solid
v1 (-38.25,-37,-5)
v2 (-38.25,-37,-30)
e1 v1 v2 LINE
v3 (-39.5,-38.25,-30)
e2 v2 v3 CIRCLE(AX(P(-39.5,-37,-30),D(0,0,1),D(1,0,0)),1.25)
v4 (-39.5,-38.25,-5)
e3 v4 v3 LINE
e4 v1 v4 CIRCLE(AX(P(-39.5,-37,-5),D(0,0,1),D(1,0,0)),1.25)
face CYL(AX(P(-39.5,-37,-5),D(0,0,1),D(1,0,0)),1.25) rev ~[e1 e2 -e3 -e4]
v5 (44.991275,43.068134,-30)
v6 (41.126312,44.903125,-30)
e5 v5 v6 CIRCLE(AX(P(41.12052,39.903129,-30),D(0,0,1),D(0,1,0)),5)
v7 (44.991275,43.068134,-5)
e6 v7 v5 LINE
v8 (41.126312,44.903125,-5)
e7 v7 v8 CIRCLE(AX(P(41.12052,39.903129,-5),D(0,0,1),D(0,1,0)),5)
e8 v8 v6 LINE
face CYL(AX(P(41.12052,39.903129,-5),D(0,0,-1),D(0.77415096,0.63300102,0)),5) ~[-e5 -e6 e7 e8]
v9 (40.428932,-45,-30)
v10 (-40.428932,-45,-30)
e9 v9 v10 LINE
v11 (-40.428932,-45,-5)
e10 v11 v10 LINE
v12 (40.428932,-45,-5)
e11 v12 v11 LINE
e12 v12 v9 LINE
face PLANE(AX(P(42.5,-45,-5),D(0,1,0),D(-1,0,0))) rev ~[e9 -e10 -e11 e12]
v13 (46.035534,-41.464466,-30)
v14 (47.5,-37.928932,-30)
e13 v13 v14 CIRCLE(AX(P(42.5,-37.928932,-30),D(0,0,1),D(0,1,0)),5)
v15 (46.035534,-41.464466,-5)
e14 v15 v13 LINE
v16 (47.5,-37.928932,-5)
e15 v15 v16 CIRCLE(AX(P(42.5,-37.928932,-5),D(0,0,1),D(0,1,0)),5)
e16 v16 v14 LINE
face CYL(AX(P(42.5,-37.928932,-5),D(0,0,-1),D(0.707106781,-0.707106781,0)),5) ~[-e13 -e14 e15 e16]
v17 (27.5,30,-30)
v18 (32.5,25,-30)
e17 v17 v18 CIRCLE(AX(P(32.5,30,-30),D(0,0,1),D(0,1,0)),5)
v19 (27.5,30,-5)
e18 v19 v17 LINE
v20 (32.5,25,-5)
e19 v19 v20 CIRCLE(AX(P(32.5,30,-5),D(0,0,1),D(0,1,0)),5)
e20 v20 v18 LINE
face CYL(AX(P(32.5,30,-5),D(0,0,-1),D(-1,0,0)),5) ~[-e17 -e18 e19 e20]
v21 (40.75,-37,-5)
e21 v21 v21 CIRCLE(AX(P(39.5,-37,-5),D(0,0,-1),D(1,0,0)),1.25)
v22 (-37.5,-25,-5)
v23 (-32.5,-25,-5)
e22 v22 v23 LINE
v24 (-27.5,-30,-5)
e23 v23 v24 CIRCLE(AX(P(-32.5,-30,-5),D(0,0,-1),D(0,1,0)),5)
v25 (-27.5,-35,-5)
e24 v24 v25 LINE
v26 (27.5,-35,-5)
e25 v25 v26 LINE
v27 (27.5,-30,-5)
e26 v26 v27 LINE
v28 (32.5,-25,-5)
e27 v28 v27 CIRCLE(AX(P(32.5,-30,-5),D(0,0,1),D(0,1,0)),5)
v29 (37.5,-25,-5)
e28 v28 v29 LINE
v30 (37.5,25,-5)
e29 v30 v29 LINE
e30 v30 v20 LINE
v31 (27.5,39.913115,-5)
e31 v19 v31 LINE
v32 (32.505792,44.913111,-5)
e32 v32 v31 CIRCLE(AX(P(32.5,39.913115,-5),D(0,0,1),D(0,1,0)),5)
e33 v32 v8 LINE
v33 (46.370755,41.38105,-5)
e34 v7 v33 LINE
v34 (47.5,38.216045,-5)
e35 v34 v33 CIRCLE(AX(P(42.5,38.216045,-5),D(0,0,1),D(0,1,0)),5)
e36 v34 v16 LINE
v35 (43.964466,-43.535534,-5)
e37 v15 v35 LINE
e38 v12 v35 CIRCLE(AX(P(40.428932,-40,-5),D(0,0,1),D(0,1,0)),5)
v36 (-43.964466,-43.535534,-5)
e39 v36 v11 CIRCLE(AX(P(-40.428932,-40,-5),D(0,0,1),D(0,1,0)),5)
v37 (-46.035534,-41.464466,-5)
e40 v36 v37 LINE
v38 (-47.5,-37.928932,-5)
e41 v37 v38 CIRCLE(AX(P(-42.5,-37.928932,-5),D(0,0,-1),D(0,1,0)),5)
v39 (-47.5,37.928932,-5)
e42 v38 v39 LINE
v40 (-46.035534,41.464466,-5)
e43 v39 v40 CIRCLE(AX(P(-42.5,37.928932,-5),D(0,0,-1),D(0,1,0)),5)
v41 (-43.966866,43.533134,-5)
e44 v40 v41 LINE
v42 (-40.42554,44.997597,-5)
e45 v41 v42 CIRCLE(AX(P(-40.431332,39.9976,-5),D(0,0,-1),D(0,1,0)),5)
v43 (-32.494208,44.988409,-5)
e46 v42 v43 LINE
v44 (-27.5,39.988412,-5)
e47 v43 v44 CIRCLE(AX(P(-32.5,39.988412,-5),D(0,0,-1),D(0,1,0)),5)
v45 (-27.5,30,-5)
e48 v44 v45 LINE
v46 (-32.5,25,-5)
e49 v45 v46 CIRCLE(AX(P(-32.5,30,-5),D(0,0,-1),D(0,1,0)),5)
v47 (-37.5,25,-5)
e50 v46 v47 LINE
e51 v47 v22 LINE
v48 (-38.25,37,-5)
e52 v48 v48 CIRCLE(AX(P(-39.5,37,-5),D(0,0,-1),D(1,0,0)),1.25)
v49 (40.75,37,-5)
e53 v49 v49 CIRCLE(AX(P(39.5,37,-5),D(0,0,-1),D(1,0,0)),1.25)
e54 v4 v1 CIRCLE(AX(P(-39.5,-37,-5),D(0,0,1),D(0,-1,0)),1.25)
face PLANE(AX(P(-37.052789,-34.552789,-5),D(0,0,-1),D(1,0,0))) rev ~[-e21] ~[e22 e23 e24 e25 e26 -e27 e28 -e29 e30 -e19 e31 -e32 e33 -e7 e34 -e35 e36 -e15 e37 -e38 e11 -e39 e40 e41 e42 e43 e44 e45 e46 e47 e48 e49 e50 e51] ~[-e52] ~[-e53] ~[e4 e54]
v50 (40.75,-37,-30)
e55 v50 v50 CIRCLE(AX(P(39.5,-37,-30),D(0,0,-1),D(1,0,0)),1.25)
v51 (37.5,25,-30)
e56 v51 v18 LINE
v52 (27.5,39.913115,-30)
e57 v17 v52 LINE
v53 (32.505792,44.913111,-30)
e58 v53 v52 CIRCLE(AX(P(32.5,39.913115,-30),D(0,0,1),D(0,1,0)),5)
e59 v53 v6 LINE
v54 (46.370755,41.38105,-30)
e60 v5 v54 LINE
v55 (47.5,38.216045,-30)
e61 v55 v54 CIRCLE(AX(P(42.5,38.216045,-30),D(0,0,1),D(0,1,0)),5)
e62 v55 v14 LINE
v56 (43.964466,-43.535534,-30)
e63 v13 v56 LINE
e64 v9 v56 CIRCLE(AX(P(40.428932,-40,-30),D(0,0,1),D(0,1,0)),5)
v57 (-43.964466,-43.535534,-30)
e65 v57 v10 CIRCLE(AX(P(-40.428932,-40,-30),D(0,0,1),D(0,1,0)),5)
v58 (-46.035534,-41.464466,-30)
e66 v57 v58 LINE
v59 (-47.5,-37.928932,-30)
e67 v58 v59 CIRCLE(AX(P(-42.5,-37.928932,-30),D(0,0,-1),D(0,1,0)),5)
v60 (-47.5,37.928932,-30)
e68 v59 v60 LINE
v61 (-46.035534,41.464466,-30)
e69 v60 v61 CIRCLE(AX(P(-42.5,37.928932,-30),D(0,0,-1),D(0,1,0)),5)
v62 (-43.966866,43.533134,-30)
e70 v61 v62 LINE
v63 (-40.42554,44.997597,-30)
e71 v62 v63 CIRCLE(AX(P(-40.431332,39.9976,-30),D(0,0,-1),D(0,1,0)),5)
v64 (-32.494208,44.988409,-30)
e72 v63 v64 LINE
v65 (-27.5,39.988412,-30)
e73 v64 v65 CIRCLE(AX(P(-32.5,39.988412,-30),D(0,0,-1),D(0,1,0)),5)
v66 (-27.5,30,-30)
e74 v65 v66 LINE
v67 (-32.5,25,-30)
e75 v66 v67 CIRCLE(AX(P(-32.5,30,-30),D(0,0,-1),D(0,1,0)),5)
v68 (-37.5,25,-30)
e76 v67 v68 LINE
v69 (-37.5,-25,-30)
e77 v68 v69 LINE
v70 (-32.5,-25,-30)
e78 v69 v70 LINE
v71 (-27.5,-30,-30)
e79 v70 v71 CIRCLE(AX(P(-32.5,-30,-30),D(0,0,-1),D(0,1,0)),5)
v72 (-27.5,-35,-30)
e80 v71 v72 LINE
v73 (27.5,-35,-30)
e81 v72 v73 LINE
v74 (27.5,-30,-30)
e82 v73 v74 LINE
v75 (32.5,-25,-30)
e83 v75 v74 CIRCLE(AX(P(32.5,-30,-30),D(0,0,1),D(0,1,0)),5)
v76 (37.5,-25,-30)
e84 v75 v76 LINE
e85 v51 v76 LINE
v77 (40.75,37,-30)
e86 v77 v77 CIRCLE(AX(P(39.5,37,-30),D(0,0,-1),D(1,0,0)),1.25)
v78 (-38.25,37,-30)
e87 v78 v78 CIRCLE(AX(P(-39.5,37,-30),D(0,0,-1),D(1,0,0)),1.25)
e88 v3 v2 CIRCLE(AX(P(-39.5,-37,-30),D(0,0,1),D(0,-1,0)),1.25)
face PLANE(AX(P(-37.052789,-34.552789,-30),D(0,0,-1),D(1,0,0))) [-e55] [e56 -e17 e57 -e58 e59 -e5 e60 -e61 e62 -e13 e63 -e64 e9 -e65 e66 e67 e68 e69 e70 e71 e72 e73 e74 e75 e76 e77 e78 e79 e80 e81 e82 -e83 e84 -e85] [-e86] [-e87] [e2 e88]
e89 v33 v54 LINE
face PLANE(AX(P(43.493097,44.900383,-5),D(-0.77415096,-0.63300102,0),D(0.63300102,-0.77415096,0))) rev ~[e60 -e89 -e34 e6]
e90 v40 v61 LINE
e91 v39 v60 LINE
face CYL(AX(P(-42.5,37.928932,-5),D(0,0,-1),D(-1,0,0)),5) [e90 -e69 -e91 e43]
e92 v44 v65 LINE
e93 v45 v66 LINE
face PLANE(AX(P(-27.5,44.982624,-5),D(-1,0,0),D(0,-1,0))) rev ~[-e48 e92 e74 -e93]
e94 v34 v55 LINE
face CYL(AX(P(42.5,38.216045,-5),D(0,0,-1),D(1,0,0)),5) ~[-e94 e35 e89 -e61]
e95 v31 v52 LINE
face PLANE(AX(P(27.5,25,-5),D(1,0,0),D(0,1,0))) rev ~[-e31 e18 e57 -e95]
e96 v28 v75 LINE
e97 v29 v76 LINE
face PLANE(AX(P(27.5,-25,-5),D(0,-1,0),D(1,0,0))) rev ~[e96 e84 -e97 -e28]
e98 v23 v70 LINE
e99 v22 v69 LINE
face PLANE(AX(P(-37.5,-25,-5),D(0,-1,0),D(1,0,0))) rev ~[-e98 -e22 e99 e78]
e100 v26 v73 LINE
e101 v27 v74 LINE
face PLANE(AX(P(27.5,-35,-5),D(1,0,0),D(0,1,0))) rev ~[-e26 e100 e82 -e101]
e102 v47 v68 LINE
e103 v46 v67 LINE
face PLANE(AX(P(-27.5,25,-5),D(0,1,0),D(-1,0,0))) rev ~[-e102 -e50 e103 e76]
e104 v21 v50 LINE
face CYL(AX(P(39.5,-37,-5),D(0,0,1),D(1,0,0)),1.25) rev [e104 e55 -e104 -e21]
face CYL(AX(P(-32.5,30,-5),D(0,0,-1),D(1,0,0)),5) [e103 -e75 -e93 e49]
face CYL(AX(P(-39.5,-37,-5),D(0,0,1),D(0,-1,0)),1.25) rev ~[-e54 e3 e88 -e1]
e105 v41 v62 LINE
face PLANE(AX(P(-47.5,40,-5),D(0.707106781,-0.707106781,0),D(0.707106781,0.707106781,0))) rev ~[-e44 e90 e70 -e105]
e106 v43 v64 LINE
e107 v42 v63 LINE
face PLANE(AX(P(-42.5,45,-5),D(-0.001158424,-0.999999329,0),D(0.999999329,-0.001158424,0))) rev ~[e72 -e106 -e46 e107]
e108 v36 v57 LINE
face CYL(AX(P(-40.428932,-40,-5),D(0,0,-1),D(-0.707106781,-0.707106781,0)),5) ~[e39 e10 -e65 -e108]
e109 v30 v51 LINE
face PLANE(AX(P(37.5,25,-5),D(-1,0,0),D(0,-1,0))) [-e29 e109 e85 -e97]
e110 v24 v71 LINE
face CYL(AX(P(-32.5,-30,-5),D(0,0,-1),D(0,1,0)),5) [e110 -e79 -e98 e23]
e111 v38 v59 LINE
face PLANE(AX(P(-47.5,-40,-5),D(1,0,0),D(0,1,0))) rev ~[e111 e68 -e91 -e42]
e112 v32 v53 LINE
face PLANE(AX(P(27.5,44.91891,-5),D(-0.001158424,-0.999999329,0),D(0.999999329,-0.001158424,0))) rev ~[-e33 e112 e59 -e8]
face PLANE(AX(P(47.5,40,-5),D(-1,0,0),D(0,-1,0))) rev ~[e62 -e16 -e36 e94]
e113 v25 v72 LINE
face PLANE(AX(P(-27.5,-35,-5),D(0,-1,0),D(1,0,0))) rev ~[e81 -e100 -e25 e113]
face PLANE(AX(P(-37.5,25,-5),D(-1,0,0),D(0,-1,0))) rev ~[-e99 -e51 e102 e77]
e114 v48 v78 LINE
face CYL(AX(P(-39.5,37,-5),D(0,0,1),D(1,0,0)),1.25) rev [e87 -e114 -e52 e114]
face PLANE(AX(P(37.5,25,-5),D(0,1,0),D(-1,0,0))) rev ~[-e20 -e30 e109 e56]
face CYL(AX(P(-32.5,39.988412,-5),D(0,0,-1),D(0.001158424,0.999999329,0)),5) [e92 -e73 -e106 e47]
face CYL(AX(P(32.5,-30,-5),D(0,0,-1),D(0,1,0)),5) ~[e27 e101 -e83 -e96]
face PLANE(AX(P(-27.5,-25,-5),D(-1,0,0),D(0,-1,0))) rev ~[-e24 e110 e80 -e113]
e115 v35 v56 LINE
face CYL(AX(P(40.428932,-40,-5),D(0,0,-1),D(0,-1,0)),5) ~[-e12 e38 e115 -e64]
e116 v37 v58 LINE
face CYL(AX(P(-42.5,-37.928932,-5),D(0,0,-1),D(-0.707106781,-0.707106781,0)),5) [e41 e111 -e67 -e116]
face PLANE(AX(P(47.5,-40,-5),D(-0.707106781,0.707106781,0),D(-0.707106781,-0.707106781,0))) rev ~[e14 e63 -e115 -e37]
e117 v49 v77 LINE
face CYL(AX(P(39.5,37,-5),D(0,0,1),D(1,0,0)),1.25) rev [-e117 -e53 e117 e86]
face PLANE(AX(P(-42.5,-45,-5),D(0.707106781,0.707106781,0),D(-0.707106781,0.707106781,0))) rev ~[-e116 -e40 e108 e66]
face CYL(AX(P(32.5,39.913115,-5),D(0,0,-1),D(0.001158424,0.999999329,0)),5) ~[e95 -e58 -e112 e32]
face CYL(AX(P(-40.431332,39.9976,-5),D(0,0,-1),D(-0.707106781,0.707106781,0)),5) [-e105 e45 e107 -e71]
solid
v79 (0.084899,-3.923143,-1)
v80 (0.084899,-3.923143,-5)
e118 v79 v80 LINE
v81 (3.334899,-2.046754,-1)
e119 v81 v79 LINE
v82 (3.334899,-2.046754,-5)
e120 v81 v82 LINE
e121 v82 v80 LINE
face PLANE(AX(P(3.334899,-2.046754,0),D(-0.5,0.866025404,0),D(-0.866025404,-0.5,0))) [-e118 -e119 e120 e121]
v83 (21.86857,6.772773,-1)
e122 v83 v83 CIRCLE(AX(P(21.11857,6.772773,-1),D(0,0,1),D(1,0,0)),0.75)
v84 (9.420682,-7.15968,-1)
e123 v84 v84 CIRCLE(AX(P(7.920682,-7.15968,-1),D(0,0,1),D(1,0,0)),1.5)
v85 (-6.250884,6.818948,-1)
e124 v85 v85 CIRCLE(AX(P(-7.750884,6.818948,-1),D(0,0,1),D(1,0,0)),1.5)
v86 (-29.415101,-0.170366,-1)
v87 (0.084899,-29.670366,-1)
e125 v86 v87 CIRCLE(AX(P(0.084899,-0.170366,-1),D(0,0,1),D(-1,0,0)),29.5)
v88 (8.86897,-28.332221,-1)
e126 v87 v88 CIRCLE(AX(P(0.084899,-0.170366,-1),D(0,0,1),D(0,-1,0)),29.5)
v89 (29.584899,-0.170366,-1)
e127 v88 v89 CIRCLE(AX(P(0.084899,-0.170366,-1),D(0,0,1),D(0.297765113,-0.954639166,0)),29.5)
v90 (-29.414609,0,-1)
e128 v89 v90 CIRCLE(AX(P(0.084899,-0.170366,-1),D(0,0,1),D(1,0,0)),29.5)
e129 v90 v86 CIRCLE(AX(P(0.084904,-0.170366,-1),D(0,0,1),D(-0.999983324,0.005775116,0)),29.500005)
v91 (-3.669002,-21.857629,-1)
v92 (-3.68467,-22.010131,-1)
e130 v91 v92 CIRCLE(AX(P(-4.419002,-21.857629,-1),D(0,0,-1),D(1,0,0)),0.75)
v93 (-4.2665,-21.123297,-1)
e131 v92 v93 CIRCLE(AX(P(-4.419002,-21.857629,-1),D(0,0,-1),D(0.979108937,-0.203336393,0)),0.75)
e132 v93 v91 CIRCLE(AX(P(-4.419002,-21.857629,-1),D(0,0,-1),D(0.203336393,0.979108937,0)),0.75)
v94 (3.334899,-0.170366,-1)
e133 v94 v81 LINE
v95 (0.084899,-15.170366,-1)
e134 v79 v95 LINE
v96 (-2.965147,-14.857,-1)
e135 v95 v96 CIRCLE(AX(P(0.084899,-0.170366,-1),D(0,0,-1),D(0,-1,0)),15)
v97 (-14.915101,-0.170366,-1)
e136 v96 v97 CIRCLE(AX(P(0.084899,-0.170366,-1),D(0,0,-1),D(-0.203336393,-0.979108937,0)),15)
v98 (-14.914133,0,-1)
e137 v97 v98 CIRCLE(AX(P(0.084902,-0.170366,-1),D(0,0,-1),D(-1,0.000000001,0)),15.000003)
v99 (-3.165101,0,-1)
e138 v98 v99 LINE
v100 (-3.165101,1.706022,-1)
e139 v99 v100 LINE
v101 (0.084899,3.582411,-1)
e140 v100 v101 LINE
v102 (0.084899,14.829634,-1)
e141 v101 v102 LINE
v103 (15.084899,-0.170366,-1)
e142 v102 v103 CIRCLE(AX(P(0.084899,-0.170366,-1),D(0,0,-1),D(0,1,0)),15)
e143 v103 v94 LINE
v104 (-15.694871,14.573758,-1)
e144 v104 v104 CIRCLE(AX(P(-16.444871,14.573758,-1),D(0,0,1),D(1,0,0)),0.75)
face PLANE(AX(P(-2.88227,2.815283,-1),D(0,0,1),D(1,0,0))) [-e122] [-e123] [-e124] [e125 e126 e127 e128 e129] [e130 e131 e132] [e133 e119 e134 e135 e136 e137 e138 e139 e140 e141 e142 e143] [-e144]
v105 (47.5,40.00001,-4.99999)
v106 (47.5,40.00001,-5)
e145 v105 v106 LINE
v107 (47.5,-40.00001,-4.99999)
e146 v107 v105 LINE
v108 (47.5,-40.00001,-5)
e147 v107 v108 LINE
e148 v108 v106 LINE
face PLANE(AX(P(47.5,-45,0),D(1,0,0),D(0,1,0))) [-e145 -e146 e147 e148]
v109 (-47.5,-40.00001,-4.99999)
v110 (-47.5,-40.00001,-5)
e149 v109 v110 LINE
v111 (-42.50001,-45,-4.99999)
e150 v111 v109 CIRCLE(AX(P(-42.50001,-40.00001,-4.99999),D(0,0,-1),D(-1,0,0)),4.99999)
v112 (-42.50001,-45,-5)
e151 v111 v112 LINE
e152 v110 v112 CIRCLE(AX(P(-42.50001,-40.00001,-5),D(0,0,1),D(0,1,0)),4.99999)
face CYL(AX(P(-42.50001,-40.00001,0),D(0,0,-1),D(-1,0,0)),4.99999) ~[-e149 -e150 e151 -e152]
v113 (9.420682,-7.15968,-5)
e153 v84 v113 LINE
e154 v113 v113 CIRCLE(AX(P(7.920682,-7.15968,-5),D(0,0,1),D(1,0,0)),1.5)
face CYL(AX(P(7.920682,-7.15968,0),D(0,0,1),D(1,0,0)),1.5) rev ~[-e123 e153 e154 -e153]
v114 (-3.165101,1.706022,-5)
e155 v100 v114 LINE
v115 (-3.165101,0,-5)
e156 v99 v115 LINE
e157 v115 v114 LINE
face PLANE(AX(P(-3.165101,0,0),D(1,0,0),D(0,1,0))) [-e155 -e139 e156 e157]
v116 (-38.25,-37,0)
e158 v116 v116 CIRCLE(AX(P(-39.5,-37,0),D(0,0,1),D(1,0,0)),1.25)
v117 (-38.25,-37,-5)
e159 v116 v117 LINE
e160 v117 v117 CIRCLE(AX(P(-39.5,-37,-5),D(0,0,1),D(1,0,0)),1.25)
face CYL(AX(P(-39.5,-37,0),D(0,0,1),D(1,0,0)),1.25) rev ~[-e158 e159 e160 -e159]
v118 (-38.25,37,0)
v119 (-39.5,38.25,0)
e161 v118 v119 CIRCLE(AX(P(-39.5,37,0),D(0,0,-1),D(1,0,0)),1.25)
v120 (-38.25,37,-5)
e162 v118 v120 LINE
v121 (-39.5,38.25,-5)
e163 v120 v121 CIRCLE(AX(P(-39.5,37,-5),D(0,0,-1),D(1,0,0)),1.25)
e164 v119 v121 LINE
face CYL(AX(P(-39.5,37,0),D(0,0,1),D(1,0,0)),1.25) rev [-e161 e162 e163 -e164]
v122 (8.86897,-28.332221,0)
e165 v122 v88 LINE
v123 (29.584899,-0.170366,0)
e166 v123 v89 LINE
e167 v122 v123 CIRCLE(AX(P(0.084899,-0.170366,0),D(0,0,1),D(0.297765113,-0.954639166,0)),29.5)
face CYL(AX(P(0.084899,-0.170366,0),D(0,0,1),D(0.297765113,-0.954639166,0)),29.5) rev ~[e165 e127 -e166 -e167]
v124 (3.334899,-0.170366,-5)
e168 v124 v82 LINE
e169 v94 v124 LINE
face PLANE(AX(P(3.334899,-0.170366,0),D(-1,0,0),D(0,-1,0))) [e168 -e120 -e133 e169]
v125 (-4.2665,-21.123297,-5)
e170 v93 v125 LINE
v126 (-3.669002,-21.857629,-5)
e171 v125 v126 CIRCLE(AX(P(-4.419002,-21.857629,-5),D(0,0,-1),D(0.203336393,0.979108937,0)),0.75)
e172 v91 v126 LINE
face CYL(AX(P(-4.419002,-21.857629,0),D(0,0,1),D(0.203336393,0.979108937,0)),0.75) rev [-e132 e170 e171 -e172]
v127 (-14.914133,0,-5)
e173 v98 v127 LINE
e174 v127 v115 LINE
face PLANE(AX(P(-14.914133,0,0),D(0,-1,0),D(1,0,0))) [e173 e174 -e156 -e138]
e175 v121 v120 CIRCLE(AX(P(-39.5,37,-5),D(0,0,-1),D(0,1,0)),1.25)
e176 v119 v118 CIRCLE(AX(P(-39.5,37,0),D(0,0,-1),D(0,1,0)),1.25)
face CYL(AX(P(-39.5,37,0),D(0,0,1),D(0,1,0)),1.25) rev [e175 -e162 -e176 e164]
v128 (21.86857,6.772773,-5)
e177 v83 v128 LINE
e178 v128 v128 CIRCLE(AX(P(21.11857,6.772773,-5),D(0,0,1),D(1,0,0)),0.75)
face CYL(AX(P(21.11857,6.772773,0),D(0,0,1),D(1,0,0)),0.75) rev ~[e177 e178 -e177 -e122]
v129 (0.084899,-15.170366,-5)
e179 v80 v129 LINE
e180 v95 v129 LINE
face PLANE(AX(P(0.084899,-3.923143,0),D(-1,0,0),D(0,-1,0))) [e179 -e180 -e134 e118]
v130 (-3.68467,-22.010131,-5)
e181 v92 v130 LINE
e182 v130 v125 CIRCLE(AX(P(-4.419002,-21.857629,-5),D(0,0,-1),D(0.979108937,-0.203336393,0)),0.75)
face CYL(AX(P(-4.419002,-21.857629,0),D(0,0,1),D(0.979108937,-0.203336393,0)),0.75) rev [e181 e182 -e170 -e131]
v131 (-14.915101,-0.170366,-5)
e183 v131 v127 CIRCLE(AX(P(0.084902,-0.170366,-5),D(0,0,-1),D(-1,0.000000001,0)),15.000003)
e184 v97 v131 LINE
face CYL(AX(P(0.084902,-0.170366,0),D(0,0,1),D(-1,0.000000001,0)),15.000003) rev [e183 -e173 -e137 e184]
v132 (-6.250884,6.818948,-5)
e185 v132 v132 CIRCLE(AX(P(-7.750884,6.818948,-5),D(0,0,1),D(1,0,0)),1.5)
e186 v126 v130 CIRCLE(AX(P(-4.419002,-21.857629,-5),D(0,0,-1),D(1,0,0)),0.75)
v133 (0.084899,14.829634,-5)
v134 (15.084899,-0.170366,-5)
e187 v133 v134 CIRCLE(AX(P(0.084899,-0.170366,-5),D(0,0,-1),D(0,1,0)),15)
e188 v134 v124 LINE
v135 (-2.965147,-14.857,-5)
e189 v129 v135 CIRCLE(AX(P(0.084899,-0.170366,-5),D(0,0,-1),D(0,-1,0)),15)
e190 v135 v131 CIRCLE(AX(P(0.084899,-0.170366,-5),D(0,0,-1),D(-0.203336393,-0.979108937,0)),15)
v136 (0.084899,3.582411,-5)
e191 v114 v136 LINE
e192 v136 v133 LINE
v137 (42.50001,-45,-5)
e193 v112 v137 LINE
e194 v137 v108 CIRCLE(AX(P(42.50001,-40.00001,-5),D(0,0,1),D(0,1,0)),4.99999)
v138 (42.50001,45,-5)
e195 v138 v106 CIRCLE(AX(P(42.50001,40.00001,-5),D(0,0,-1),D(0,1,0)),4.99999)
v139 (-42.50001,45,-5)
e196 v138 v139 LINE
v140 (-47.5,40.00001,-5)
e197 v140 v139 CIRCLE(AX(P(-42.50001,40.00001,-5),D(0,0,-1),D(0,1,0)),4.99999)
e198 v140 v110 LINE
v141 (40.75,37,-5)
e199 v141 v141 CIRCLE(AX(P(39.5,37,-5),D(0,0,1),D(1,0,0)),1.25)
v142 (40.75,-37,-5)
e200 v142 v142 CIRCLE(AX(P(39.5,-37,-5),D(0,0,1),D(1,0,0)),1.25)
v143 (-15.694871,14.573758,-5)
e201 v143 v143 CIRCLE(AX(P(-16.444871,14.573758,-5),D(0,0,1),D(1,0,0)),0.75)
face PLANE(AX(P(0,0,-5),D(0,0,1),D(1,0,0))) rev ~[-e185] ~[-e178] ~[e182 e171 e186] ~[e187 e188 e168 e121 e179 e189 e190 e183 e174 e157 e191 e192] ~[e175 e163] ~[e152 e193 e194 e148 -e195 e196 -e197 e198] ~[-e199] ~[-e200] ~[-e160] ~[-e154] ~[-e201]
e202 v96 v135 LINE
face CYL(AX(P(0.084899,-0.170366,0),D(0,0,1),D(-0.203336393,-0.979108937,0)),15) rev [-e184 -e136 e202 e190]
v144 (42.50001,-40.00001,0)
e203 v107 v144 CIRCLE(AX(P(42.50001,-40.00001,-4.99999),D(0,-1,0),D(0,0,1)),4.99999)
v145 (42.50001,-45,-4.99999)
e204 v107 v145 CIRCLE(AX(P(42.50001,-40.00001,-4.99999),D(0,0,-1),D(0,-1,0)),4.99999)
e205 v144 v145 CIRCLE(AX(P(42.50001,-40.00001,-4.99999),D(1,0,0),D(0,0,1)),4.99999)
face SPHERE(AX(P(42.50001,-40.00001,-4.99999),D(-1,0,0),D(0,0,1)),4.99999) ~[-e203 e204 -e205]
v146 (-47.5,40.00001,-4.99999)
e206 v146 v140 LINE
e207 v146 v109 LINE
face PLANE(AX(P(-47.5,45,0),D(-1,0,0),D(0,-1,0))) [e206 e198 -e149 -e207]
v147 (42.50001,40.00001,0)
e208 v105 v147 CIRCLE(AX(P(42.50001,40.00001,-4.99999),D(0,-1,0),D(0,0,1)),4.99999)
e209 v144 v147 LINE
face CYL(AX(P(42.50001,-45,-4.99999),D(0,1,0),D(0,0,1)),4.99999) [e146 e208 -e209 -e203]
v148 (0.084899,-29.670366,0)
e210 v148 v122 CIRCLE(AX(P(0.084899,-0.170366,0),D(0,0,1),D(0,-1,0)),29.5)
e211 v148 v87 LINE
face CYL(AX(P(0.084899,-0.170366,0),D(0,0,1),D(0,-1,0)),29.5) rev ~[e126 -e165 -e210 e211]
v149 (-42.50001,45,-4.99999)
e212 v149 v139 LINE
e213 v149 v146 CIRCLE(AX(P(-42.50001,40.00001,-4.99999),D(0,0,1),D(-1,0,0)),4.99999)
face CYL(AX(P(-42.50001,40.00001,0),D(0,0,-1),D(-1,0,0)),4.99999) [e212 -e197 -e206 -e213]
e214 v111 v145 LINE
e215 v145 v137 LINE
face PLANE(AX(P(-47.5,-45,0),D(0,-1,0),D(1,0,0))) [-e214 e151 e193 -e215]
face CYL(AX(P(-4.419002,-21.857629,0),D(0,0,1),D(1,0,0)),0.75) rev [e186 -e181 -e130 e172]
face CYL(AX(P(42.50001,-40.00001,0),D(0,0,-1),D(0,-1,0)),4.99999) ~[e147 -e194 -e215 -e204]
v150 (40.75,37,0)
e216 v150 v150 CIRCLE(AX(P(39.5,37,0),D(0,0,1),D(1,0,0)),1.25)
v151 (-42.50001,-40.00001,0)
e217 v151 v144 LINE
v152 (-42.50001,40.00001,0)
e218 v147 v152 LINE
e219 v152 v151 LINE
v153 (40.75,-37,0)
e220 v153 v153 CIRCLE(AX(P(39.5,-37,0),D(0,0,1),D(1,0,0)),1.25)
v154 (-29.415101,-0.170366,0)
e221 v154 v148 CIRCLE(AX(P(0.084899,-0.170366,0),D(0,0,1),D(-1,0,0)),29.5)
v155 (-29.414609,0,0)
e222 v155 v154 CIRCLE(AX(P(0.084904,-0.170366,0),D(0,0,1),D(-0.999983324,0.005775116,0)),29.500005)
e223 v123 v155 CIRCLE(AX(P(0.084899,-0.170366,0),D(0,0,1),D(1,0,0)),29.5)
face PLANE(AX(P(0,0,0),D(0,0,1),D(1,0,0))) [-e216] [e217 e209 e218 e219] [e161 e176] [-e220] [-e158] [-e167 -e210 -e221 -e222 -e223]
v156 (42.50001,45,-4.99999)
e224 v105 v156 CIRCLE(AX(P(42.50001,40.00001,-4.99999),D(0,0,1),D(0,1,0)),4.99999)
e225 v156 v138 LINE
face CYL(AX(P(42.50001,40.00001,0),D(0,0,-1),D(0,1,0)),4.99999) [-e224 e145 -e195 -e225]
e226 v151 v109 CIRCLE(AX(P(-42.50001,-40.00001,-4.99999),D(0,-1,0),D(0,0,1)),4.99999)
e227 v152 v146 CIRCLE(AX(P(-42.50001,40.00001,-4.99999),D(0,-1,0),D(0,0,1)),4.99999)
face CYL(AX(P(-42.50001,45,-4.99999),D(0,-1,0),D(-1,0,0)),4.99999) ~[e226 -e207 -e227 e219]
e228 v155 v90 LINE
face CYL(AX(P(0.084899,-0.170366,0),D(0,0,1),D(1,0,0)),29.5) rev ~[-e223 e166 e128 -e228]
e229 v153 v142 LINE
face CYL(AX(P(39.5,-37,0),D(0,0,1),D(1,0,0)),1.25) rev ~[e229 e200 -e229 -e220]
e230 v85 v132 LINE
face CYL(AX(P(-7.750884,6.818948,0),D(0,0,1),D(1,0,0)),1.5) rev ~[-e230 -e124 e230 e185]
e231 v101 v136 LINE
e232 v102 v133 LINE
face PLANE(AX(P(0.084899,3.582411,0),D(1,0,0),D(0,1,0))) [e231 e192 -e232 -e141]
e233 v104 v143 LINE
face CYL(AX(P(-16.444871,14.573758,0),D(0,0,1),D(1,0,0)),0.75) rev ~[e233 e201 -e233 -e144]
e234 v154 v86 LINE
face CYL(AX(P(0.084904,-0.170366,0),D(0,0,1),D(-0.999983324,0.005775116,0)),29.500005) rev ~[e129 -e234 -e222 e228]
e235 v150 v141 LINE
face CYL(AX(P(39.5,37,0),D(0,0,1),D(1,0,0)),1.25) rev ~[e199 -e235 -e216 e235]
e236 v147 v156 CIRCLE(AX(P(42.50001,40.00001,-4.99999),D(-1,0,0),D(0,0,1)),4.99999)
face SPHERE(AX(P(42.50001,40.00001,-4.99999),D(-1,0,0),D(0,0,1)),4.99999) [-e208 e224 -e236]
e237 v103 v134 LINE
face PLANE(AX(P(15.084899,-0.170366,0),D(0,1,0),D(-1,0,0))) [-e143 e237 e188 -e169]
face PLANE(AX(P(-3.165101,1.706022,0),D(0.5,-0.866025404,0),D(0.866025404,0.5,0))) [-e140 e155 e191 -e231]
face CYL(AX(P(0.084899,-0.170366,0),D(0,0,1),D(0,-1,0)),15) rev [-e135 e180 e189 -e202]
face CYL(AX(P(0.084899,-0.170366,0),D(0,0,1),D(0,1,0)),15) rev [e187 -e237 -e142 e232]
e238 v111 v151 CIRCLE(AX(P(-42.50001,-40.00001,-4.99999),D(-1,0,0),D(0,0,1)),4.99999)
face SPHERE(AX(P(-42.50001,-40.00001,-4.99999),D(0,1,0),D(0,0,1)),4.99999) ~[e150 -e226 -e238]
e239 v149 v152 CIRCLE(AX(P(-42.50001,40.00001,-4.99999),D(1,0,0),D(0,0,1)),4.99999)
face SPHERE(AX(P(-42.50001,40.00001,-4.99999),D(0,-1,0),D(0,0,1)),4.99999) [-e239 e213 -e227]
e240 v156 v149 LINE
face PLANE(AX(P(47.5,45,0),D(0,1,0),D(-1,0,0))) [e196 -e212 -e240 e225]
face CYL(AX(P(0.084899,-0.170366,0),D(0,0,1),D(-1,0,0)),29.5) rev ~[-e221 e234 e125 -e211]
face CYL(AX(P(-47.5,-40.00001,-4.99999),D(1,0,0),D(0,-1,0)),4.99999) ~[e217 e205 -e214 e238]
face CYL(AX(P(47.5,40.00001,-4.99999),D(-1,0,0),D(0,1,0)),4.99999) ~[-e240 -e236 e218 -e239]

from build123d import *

# Parameters (mm, degrees)
F0_R     = 1.25
F0_R_2   = 1.5
F0_R_3   = 0.75
F1_DEPTH = 5
F2_DEPTH = 1
F3_R     = 4.99999
F4_W     = 10
F4_H     = 25
F4_R     = 1.25
F4_H_2   = 50
F5_DEPTH = 25
F6_R     = 5


# Not quite as in the source:
# - a fillet or chamfer is up to 0.001 mm smaller than in the source, because OpenCascade refuses the exact size
# - a feature names something its author has since deleted; it is built from what else it names


with BuildPart() as f1:
    # F0 (on Top) → F1 (new body)
    with BuildSketch(Plane.XY):
        Polygon((-47.5, 45), (-47.5, 0), (-47.5, -45), (0, -45), (47.5, -45), (47.5, 0), (47.5, 45), (0, 45), (-39.5, 45), align=None)
        with Locations((-39.5, -37)):
            Circle(F0_R, mode=Mode.SUBTRACT)
        with Locations((39.5, -37)):
            Circle(F0_R, mode=Mode.SUBTRACT)
        with BuildLine():
            ThreePointArc((-29.415100958, -0.1703659098), (-29.4149779713, -0.0851825998), (-29.4146090124, 0))
            ThreePointArc((-29.4146090124, 0), (-20.7144303421, 20.7494308667), (0.084899042, 29.3296340902))
            ThreePointArc((0.084899042, 29.3296340902), (20.944549087, 20.6892841352), (29.584899042, -0.1703659098))
            ThreePointArc((29.584899042, -0.1703659098), (23.8481068353, -17.6506392307), (8.8689698641, -28.3322213137))
            ThreePointArc((8.8689698641, -28.3322213137), (4.5276046132, -29.3339110854), (0.084899042, -29.6703659098))
            ThreePointArc((0.084899042, -29.6703659098), (-20.774751003, -21.0300159548), (-29.415100958, -0.1703659098))
        make_face(mode=Mode.SUBTRACT)
        with BuildLine():
            ThreePointArc((-38.25, 37), (-40.3838834765, 36.1161165235), (-39.5, 38.25))
            ThreePointArc((-39.5, 38.25), (-38.6161165235, 37.8838834765), (-38.25, 37))
        make_face(mode=Mode.SUBTRACT)
        with Locations((39.5, 37)):
            Circle(F0_R, mode=Mode.SUBTRACT)
        with BuildLine():
            Line((0.084899042, 29.3296340902), (0.084899042, 14.8296340902))
            ThreePointArc((0.084899042, 14.8296340902), (10.6915007598, 10.436235808), (15.084899042, -0.1703659098))
            Line((15.084899042, -0.1703659098), (29.584899042, -0.1703659098))
            ThreePointArc((29.584899042, -0.1703659098), (20.944549087, 20.6892841352), (0.084899042, 29.3296340902))
        make_face()
        Polygon((17.6671119439, 8.3875283412), (20.791260429, 10.5692011497), (24.2427187464, 8.9544456008), (24.5700285789, 5.1580172433), (21.4458800938, 2.9763444347), (17.9944217764, 4.5910999837), align=None, mode=Mode.SUBTRACT)
        with BuildLine():
            Line((29.584899042, -0.1703659098), (15.084899042, -0.1703659098))
            ThreePointArc((15.084899042, -0.1703659098), (10.6915007598, -10.7769676276), (0.084899042, -15.1703659098))
            Line((0.084899042, -15.1703659098), (0.084899042, -22.7929762808))
            Line((0.084899042, -22.7929762808), (0.084899042, -25.415358255))
            Line((0.084899042, -25.415358255), (0.084899042, -29.6703659098))
            ThreePointArc((0.084899042, -29.6703659098), (4.5276046132, -29.3339110854), (8.8689698641, -28.3322213137))
            ThreePointArc((8.8689698641, -28.3322213137), (23.8481068353, -17.6506392307), (29.584899042, -0.1703659098))
        make_face()
        with BuildLine():
            Line((-29.4146090124, 0), (-14.914133442, 0))
            ThreePointArc((-14.914133442, 0), (-10.4612972237, 10.4962991887), (0.084899042, 14.8296340902))
            Line((0.084899042, 14.8296340902), (0.084899042, 29.3296340902))
            ThreePointArc((0.084899042, 29.3296340902), (-20.7144303421, 20.7494308667), (-29.4146090124, 0))
        make_face()
        Polygon((-18.3295369154, 17.5667340919), (-14.7952109651, 17.7024147245), (-12.9105451153, 14.7094389826), (-14.5602052158, 11.5807826081), (-18.0945311661, 11.4451019755), (-19.9791970159, 14.4380777174), align=None, mode=Mode.SUBTRACT)
        with BuildLine():
            ThreePointArc((-2.9651468575, -14.8569999697), (-11.5501920297, -9.6373958428), (-14.915100958, -0.1703659098))
            Line((-14.915100958, -0.1703659098), (-29.415100958, -0.1703659098))
            ThreePointArc((-29.415100958, -0.1703659098), (-20.774751003, -21.0300159548), (0.084899042, -29.6703659098))
            Line((0.084899042, -29.6703659098), (0.084899042, -25.415358255))
            Line((0.084899042, -25.415358255), (0.084899042, -22.7929762808))
            Line((0.084899042, -22.7929762808), (-1.0164592122, -22.5642517676))
            Line((-1.0164592122, -22.5642517676), (-2.5137461813, -25.1576288716))
            Line((-2.5137461813, -25.1576288716), (-6.324257958, -25.1576288716))
            Line((-6.324257958, -25.1576288716), (-8.2295138463, -21.8576288716))
            Line((-8.2295138463, -21.8576288716), (-6.324257958, -18.5576288716))
            Line((-6.324257958, -18.5576288716), (-3.7336747559, -18.5576288716))
            Line((-3.7336747559, -18.5576288716), (-2.9651468575, -14.8569999697))
        make_face()
        with BuildLine():
            Line((15.084899042, -0.1703659098), (6.084899042, -0.1703659098))
            ThreePointArc((6.084899042, -0.1703659098), (4.3275397292, -4.4130065969), (0.084899042, -6.1703659098))
            Line((0.084899042, -6.1703659098), (0.084899042, -15.1703659098))
            ThreePointArc((0.084899042, -15.1703659098), (10.6915007598, -10.7769676276), (15.084899042, -0.1703659098))
        make_face()
        with Locations((7.9206817116, -7.159679893)):
            Circle(F0_R_2, mode=Mode.SUBTRACT)
        with BuildLine():
            Line((-14.914133442, 0), (-5.9126817583, 0))
            ThreePointArc((-5.9126817583, 0), (-4.0970744479, 4.1320866151), (0.084899042, 5.8296340902))
            Line((0.084899042, 5.8296340902), (0.084899042, 14.8296340902))
            ThreePointArc((0.084899042, 14.8296340902), (-10.4612972237, 10.4962991887), (-14.914133442, 0))
        make_face()
        with Locations((-7.7508836275, 6.8189480734)):
            Circle(F0_R_2, mode=Mode.SUBTRACT)
        Polygon((24.2427187464, 8.9544456008), (20.791260429, 10.5692011497), (17.6671119439, 8.3875283412), (17.9944217764, 4.5910999837), (21.4458800938, 2.9763444347), (24.5700285789, 5.1580172433), align=None)
        with Locations((21.1185702614, 6.7727727922)):
            Circle(F0_R_3, mode=Mode.SUBTRACT)
        Polygon((-12.9105451153, 14.7094389826), (-14.7952109651, 17.7024147245), (-18.3295369154, 17.5667340919), (-19.9791970159, 14.4380777174), (-18.0945311661, 11.4451019755), (-14.5602052158, 11.5807826081), align=None)
        with Locations((-16.4448710656, 14.57375835)):
            Circle(F0_R_3, mode=Mode.SUBTRACT)
        with BuildLine():
            Line((-4.2664997747, -21.1232971686), (-3.7336747559, -18.5576288716))
            Line((-3.7336747559, -18.5576288716), (-6.324257958, -18.5576288716))
            Line((-6.324257958, -18.5576288716), (-8.2295138463, -21.8576288716))
            Line((-8.2295138463, -21.8576288716), (-6.324257958, -25.1576288716))
            Line((-6.324257958, -25.1576288716), (-2.5137461813, -25.1576288716))
            Line((-2.5137461813, -25.1576288716), (-1.0164592122, -22.5642517676))
            Line((-1.0164592122, -22.5642517676), (-3.6846703667, -22.0101311666))
            ThreePointArc((-3.6846703667, -22.0101311666), (-5.0460884034, -22.2690443915), (-4.2664997747, -21.1232971686))
        make_face()
        with BuildLine():
            ThreePointArc((0.084899042, -6.1703659098), (4.3275397292, -4.4130065969), (6.084899042, -0.1703659098))
            Line((6.084899042, -0.1703659098), (3.334899042, -0.1703659098))
            Line((3.334899042, -0.1703659098), (3.334899042, -2.0467542847))
            Line((3.334899042, -2.0467542847), (0.084899042, -3.9231426595))
            Line((0.084899042, -3.9231426595), (0.084899042, -6.1703659098))
        make_face()
        with BuildLine():
            Line((-5.9126817583, 0), (-3.165100958, 0))
            Line((-3.165100958, 0), (-3.165100958, 1.7060224651))
            Line((-3.165100958, 1.7060224651), (0.084899042, 3.5824108399))
            Line((0.084899042, 3.5824108399), (0.084899042, 5.8296340902))
            ThreePointArc((0.084899042, 5.8296340902), (-4.0970744479, 4.1320866151), (-5.9126817583, 0))
        make_face()
        with BuildLine():
            ThreePointArc((0.084899042, -15.1703659098), (-1.4481516911, -15.0918187697), (-2.9651468575, -14.8569999697))
            Line((-2.9651468575, -14.8569999697), (-3.7336747559, -18.5576288716))
            Line((-3.7336747559, -18.5576288716), (-2.5137461813, -18.5576288716))
            Line((-2.5137461813, -18.5576288716), (-0.608490293, -21.8576288716))
            Line((-0.608490293, -21.8576288716), (-1.0164592122, -22.5642517676))
            Line((-1.0164592122, -22.5642517676), (0.084899042, -22.7929762808))
            Line((0.084899042, -22.7929762808), (0.084899042, -15.1703659098))
        make_face()
        with BuildLine():
            Line((-2.5137461813, -18.5576288716), (-3.7336747559, -18.5576288716))
            Line((-3.7336747559, -18.5576288716), (-4.2664997747, -21.1232971686))
            ThreePointArc((-4.2664997747, -21.1232971686), (-3.8372475161, -21.384277375), (-3.6690020697, -21.8576288716))
            ThreePointArc((-3.6690020697, -21.8576288716), (-3.6729294267, -21.9342814083), (-3.6846703667, -22.0101311666))
            Line((-3.6846703667, -22.0101311666), (-1.0164592122, -22.5642517676))
            Line((-1.0164592122, -22.5642517676), (-0.608490293, -21.8576288716))
            Line((-0.608490293, -21.8576288716), (-2.5137461813, -18.5576288716))
        make_face()
        with BuildLine():
            ThreePointArc((-14.915100958, -0.1703659098), (-14.914859077, -0.0851815813), (-14.914133442, 0))
            Line((-14.914133442, 0), (-29.4146090124, 0))
            ThreePointArc((-29.4146090124, 0), (-29.4149779713, -0.0851825998), (-29.415100958, -0.1703659098))
            Line((-29.415100958, -0.1703659098), (-14.915100958, -0.1703659098))
        make_face()
    extrude(amount=-F1_DEPTH)

    # F0 (on Top) → F2 (cut)
    with BuildSketch(Plane.XY):
        with BuildLine():
            Line((-5.9126817583, 0), (-3.165100958, 0))
            Line((-3.165100958, 0), (-3.165100958, 1.7060224651))
            Line((-3.165100958, 1.7060224651), (0.084899042, 3.5824108399))
            Line((0.084899042, 3.5824108399), (0.084899042, 5.8296340902))
            ThreePointArc((0.084899042, 5.8296340902), (-4.0970744479, 4.1320866151), (-5.9126817583, 0))
        make_face()
        with BuildLine():
            Line((-14.914133442, 0), (-5.9126817583, 0))
            ThreePointArc((-5.9126817583, 0), (-4.0970744479, 4.1320866151), (0.084899042, 5.8296340902))
            Line((0.084899042, 5.8296340902), (0.084899042, 14.8296340902))
            ThreePointArc((0.084899042, 14.8296340902), (-10.4612972237, 10.4962991887), (-14.914133442, 0))
        make_face()
        with Locations((-7.7508836275, 6.8189480734)):
            Circle(F0_R_2, mode=Mode.SUBTRACT)
        with BuildLine():
            ThreePointArc((-14.915100958, -0.1703659098), (-14.914859077, -0.0851815813), (-14.914133442, 0))
            Line((-14.914133442, 0), (-29.4146090124, 0))
            ThreePointArc((-29.4146090124, 0), (-29.4149779713, -0.0851825998), (-29.415100958, -0.1703659098))
            Line((-29.415100958, -0.1703659098), (-14.915100958, -0.1703659098))
        make_face()
        with BuildLine():
            Line((-29.4146090124, 0), (-14.914133442, 0))
            ThreePointArc((-14.914133442, 0), (-10.4612972237, 10.4962991887), (0.084899042, 14.8296340902))
            Line((0.084899042, 14.8296340902), (0.084899042, 29.3296340902))
            ThreePointArc((0.084899042, 29.3296340902), (-20.7144303421, 20.7494308667), (-29.4146090124, 0))
        make_face()
        Polygon((-18.3295369154, 17.5667340919), (-14.7952109651, 17.7024147245), (-12.9105451153, 14.7094389826), (-14.5602052158, 11.5807826081), (-18.0945311661, 11.4451019755), (-19.9791970159, 14.4380777174), align=None, mode=Mode.SUBTRACT)
        with BuildLine():
            Line((0.084899042, 29.3296340902), (0.084899042, 14.8296340902))
            ThreePointArc((0.084899042, 14.8296340902), (10.6915007598, 10.436235808), (15.084899042, -0.1703659098))
            Line((15.084899042, -0.1703659098), (29.584899042, -0.1703659098))
            ThreePointArc((29.584899042, -0.1703659098), (20.944549087, 20.6892841352), (0.084899042, 29.3296340902))
        make_face()
        Polygon((17.6671119439, 8.3875283412), (20.791260429, 10.5692011497), (24.2427187464, 8.9544456008), (24.5700285789, 5.1580172433), (21.4458800938, 2.9763444347), (17.9944217764, 4.5910999837), align=None, mode=Mode.SUBTRACT)
        with BuildLine():
            ThreePointArc((-2.9651468575, -14.8569999697), (-11.5501920297, -9.6373958428), (-14.915100958, -0.1703659098))
            Line((-14.915100958, -0.1703659098), (-29.415100958, -0.1703659098))
            ThreePointArc((-29.415100958, -0.1703659098), (-20.774751003, -21.0300159548), (0.084899042, -29.6703659098))
            Line((0.084899042, -29.6703659098), (0.084899042, -25.415358255))
            Line((0.084899042, -25.415358255), (0.084899042, -22.7929762808))
            Line((0.084899042, -22.7929762808), (-1.0164592122, -22.5642517676))
            Line((-1.0164592122, -22.5642517676), (-2.5137461813, -25.1576288716))
            Line((-2.5137461813, -25.1576288716), (-6.324257958, -25.1576288716))
            Line((-6.324257958, -25.1576288716), (-8.2295138463, -21.8576288716))
            Line((-8.2295138463, -21.8576288716), (-6.324257958, -18.5576288716))
            Line((-6.324257958, -18.5576288716), (-3.7336747559, -18.5576288716))
            Line((-3.7336747559, -18.5576288716), (-2.9651468575, -14.8569999697))
        make_face()
        with BuildLine():
            ThreePointArc((0.084899042, -6.1703659098), (4.3275397292, -4.4130065969), (6.084899042, -0.1703659098))
            Line((6.084899042, -0.1703659098), (3.334899042, -0.1703659098))
            Line((3.334899042, -0.1703659098), (3.334899042, -2.0467542847))
            Line((3.334899042, -2.0467542847), (0.084899042, -3.9231426595))
            Line((0.084899042, -3.9231426595), (0.084899042, -6.1703659098))
        make_face()
        with BuildLine():
            Line((15.084899042, -0.1703659098), (6.084899042, -0.1703659098))
            ThreePointArc((6.084899042, -0.1703659098), (4.3275397292, -4.4130065969), (0.084899042, -6.1703659098))
            Line((0.084899042, -6.1703659098), (0.084899042, -15.1703659098))
            ThreePointArc((0.084899042, -15.1703659098), (10.6915007598, -10.7769676276), (15.084899042, -0.1703659098))
        make_face()
        with Locations((7.9206817116, -7.159679893)):
            Circle(F0_R_2, mode=Mode.SUBTRACT)
        with BuildLine():
            Line((29.584899042, -0.1703659098), (15.084899042, -0.1703659098))
            ThreePointArc((15.084899042, -0.1703659098), (10.6915007598, -10.7769676276), (0.084899042, -15.1703659098))
            Line((0.084899042, -15.1703659098), (0.084899042, -22.7929762808))
            Line((0.084899042, -22.7929762808), (0.084899042, -25.415358255))
            Line((0.084899042, -25.415358255), (0.084899042, -29.6703659098))
            ThreePointArc((0.084899042, -29.6703659098), (4.5276046132, -29.3339110854), (8.8689698641, -28.3322213137))
            ThreePointArc((8.8689698641, -28.3322213137), (23.8481068353, -17.6506392307), (29.584899042, -0.1703659098))
        make_face()
        with BuildLine():
            ThreePointArc((0.084899042, -15.1703659098), (-1.4481516911, -15.0918187697), (-2.9651468575, -14.8569999697))
            Line((-2.9651468575, -14.8569999697), (-3.7336747559, -18.5576288716))
            Line((-3.7336747559, -18.5576288716), (-2.5137461813, -18.5576288716))
            Line((-2.5137461813, -18.5576288716), (-0.608490293, -21.8576288716))
            Line((-0.608490293, -21.8576288716), (-1.0164592122, -22.5642517676))
            Line((-1.0164592122, -22.5642517676), (0.084899042, -22.7929762808))
            Line((0.084899042, -22.7929762808), (0.084899042, -15.1703659098))
        make_face()
        with BuildLine():
            Line((-2.5137461813, -18.5576288716), (-3.7336747559, -18.5576288716))
            Line((-3.7336747559, -18.5576288716), (-4.2664997747, -21.1232971686))
            ThreePointArc((-4.2664997747, -21.1232971686), (-3.8372475161, -21.384277375), (-3.6690020697, -21.8576288716))
            ThreePointArc((-3.6690020697, -21.8576288716), (-3.6729294267, -21.9342814083), (-3.6846703667, -22.0101311666))
            Line((-3.6846703667, -22.0101311666), (-1.0164592122, -22.5642517676))
            Line((-1.0164592122, -22.5642517676), (-0.608490293, -21.8576288716))
            Line((-0.608490293, -21.8576288716), (-2.5137461813, -18.5576288716))
        make_face()
        with BuildLine():
            Line((-4.2664997747, -21.1232971686), (-3.7336747559, -18.5576288716))
            Line((-3.7336747559, -18.5576288716), (-6.324257958, -18.5576288716))
            Line((-6.324257958, -18.5576288716), (-8.2295138463, -21.8576288716))
            Line((-8.2295138463, -21.8576288716), (-6.324257958, -25.1576288716))
            Line((-6.324257958, -25.1576288716), (-2.5137461813, -25.1576288716))
            Line((-2.5137461813, -25.1576288716), (-1.0164592122, -22.5642517676))
            Line((-1.0164592122, -22.5642517676), (-3.6846703667, -22.0101311666))
            ThreePointArc((-3.6846703667, -22.0101311666), (-5.0460884034, -22.2690443915), (-4.2664997747, -21.1232971686))
        make_face()
        Polygon((-12.9105451153, 14.7094389826), (-14.7952109651, 17.7024147245), (-18.3295369154, 17.5667340919), (-19.9791970159, 14.4380777174), (-18.0945311661, 11.4451019755), (-14.5602052158, 11.5807826081), align=None)
        with Locations((-16.4448710656, 14.57375835)):
            Circle(F0_R_3, mode=Mode.SUBTRACT)
        Polygon((24.2427187464, 8.9544456008), (20.791260429, 10.5692011497), (17.6671119439, 8.3875283412), (17.9944217764, 4.5910999837), (21.4458800938, 2.9763444347), (24.5700285789, 5.1580172433), align=None)
        with Locations((21.1185702614, 6.7727727922)):
            Circle(F0_R_3, mode=Mode.SUBTRACT)
    extrude(amount=-F2_DEPTH, mode=Mode.SUBTRACT)

    # F3 (radius 5 in the source; OpenCascade refuses exactly that, so slightly less here)
    f3_edges = [f1.edges().sort_by_distance(p)[0] for p in [
        (-47.5, 0, 0),
        (0, 45, 0),
        (0, -45, 0),
        (47.5, 0, 0),
        (47.5, -45, -2.5),
        (-47.5, -45, -2.5),
        (-47.5, 45, -2.5),
        (47.5, 45, -2.5),
    ]]
    fillet(f3_edges, radius=F3_R)


with BuildPart() as f5:
    # F4 (on face) → F5 (new body)
    with BuildSketch(Plane(origin=(0, 0, -5), x_dir=(1, 0, 0), z_dir=(0, 0, -1))):
        Polygon((-27.5, 45), (-39.5, 45), (-42.5, 45), (-47.5, 40), (-47.5, 25), (-37.5, 25), (-27.5, 25), (-27.5, 35), align=None)
        with BuildLine():
            ThreePointArc((-38.25, 37), (-40.3838834765, 36.1161165235), (-39.5, 38.25))
            ThreePointArc((-39.5, 38.25), (-38.6161165235, 37.8838834765), (-38.25, 37))
        make_face(mode=Mode.SUBTRACT)
        Polygon((0, 45), (-27.5, 45), (-27.5, 35), (27.5, 35), (27.5, 45), align=None)
        with Locations((-42.5, 12.5)):
            Rectangle(F4_W, F4_H)
        Polygon((42.5, 45), (27.5, 45), (27.5, 35), (27.5, 25), (37.5, 25), (47.5, 25), (47.5, 40), align=None)
        with Locations((39.5, 37)):
            Circle(F4_R, mode=Mode.SUBTRACT)
        with Locations((-42.5, -12.5)):
            Rectangle(F4_W, F4_H)
        Polygon((-37.5, -25), (-47.5, -25), (-47.5, -40), (-42.5, -45), (-27.5, -44.9826236297), (-27.5, -35), (-27.5, -25), align=None)
        with Locations((-39.5, -37)):
            Circle(F4_R, mode=Mode.SUBTRACT)
        with Locations((42.5, 0)):
            Rectangle(F4_W, F4_H_2)
        Polygon((47.5, -25), (37.5, -25), (27.5, -25), (27.5, -35), (27.5, -44.9189102719), (43.4930970818, -44.9003834734), (47.5, -40), align=None)
        with Locations((39.5, -37)):
            Circle(F4_R, mode=Mode.SUBTRACT)
    extrude(amount=F5_DEPTH)

    # F6
    f6_edges = [f5.edges().sort_by_distance(p)[0] for p in [
        (-42.5, -45, -17.5),
        (42.5, -45, -17.5),
        (47.5, -40, -17.5),
        (47.5, 40, -17.5),
        (43.493097, 44.900383, -17.5),
        (-42.5, 45, -17.5),
        (-47.5, 40, -17.5),
        (-27.5, 44.982624, -17.5),
        (27.5, -25, -17.5),
        (-27.5, -25, -17.5),
        (-27.5, 25, -17.5),
        (27.5, 25, -17.5),
        (-47.5, -40, -17.5),
        (27.5, 44.91891, -17.5),
    ]]
    fillet(f6_edges, radius=F6_R)


solid = Compound([f1.part, f5.part])
